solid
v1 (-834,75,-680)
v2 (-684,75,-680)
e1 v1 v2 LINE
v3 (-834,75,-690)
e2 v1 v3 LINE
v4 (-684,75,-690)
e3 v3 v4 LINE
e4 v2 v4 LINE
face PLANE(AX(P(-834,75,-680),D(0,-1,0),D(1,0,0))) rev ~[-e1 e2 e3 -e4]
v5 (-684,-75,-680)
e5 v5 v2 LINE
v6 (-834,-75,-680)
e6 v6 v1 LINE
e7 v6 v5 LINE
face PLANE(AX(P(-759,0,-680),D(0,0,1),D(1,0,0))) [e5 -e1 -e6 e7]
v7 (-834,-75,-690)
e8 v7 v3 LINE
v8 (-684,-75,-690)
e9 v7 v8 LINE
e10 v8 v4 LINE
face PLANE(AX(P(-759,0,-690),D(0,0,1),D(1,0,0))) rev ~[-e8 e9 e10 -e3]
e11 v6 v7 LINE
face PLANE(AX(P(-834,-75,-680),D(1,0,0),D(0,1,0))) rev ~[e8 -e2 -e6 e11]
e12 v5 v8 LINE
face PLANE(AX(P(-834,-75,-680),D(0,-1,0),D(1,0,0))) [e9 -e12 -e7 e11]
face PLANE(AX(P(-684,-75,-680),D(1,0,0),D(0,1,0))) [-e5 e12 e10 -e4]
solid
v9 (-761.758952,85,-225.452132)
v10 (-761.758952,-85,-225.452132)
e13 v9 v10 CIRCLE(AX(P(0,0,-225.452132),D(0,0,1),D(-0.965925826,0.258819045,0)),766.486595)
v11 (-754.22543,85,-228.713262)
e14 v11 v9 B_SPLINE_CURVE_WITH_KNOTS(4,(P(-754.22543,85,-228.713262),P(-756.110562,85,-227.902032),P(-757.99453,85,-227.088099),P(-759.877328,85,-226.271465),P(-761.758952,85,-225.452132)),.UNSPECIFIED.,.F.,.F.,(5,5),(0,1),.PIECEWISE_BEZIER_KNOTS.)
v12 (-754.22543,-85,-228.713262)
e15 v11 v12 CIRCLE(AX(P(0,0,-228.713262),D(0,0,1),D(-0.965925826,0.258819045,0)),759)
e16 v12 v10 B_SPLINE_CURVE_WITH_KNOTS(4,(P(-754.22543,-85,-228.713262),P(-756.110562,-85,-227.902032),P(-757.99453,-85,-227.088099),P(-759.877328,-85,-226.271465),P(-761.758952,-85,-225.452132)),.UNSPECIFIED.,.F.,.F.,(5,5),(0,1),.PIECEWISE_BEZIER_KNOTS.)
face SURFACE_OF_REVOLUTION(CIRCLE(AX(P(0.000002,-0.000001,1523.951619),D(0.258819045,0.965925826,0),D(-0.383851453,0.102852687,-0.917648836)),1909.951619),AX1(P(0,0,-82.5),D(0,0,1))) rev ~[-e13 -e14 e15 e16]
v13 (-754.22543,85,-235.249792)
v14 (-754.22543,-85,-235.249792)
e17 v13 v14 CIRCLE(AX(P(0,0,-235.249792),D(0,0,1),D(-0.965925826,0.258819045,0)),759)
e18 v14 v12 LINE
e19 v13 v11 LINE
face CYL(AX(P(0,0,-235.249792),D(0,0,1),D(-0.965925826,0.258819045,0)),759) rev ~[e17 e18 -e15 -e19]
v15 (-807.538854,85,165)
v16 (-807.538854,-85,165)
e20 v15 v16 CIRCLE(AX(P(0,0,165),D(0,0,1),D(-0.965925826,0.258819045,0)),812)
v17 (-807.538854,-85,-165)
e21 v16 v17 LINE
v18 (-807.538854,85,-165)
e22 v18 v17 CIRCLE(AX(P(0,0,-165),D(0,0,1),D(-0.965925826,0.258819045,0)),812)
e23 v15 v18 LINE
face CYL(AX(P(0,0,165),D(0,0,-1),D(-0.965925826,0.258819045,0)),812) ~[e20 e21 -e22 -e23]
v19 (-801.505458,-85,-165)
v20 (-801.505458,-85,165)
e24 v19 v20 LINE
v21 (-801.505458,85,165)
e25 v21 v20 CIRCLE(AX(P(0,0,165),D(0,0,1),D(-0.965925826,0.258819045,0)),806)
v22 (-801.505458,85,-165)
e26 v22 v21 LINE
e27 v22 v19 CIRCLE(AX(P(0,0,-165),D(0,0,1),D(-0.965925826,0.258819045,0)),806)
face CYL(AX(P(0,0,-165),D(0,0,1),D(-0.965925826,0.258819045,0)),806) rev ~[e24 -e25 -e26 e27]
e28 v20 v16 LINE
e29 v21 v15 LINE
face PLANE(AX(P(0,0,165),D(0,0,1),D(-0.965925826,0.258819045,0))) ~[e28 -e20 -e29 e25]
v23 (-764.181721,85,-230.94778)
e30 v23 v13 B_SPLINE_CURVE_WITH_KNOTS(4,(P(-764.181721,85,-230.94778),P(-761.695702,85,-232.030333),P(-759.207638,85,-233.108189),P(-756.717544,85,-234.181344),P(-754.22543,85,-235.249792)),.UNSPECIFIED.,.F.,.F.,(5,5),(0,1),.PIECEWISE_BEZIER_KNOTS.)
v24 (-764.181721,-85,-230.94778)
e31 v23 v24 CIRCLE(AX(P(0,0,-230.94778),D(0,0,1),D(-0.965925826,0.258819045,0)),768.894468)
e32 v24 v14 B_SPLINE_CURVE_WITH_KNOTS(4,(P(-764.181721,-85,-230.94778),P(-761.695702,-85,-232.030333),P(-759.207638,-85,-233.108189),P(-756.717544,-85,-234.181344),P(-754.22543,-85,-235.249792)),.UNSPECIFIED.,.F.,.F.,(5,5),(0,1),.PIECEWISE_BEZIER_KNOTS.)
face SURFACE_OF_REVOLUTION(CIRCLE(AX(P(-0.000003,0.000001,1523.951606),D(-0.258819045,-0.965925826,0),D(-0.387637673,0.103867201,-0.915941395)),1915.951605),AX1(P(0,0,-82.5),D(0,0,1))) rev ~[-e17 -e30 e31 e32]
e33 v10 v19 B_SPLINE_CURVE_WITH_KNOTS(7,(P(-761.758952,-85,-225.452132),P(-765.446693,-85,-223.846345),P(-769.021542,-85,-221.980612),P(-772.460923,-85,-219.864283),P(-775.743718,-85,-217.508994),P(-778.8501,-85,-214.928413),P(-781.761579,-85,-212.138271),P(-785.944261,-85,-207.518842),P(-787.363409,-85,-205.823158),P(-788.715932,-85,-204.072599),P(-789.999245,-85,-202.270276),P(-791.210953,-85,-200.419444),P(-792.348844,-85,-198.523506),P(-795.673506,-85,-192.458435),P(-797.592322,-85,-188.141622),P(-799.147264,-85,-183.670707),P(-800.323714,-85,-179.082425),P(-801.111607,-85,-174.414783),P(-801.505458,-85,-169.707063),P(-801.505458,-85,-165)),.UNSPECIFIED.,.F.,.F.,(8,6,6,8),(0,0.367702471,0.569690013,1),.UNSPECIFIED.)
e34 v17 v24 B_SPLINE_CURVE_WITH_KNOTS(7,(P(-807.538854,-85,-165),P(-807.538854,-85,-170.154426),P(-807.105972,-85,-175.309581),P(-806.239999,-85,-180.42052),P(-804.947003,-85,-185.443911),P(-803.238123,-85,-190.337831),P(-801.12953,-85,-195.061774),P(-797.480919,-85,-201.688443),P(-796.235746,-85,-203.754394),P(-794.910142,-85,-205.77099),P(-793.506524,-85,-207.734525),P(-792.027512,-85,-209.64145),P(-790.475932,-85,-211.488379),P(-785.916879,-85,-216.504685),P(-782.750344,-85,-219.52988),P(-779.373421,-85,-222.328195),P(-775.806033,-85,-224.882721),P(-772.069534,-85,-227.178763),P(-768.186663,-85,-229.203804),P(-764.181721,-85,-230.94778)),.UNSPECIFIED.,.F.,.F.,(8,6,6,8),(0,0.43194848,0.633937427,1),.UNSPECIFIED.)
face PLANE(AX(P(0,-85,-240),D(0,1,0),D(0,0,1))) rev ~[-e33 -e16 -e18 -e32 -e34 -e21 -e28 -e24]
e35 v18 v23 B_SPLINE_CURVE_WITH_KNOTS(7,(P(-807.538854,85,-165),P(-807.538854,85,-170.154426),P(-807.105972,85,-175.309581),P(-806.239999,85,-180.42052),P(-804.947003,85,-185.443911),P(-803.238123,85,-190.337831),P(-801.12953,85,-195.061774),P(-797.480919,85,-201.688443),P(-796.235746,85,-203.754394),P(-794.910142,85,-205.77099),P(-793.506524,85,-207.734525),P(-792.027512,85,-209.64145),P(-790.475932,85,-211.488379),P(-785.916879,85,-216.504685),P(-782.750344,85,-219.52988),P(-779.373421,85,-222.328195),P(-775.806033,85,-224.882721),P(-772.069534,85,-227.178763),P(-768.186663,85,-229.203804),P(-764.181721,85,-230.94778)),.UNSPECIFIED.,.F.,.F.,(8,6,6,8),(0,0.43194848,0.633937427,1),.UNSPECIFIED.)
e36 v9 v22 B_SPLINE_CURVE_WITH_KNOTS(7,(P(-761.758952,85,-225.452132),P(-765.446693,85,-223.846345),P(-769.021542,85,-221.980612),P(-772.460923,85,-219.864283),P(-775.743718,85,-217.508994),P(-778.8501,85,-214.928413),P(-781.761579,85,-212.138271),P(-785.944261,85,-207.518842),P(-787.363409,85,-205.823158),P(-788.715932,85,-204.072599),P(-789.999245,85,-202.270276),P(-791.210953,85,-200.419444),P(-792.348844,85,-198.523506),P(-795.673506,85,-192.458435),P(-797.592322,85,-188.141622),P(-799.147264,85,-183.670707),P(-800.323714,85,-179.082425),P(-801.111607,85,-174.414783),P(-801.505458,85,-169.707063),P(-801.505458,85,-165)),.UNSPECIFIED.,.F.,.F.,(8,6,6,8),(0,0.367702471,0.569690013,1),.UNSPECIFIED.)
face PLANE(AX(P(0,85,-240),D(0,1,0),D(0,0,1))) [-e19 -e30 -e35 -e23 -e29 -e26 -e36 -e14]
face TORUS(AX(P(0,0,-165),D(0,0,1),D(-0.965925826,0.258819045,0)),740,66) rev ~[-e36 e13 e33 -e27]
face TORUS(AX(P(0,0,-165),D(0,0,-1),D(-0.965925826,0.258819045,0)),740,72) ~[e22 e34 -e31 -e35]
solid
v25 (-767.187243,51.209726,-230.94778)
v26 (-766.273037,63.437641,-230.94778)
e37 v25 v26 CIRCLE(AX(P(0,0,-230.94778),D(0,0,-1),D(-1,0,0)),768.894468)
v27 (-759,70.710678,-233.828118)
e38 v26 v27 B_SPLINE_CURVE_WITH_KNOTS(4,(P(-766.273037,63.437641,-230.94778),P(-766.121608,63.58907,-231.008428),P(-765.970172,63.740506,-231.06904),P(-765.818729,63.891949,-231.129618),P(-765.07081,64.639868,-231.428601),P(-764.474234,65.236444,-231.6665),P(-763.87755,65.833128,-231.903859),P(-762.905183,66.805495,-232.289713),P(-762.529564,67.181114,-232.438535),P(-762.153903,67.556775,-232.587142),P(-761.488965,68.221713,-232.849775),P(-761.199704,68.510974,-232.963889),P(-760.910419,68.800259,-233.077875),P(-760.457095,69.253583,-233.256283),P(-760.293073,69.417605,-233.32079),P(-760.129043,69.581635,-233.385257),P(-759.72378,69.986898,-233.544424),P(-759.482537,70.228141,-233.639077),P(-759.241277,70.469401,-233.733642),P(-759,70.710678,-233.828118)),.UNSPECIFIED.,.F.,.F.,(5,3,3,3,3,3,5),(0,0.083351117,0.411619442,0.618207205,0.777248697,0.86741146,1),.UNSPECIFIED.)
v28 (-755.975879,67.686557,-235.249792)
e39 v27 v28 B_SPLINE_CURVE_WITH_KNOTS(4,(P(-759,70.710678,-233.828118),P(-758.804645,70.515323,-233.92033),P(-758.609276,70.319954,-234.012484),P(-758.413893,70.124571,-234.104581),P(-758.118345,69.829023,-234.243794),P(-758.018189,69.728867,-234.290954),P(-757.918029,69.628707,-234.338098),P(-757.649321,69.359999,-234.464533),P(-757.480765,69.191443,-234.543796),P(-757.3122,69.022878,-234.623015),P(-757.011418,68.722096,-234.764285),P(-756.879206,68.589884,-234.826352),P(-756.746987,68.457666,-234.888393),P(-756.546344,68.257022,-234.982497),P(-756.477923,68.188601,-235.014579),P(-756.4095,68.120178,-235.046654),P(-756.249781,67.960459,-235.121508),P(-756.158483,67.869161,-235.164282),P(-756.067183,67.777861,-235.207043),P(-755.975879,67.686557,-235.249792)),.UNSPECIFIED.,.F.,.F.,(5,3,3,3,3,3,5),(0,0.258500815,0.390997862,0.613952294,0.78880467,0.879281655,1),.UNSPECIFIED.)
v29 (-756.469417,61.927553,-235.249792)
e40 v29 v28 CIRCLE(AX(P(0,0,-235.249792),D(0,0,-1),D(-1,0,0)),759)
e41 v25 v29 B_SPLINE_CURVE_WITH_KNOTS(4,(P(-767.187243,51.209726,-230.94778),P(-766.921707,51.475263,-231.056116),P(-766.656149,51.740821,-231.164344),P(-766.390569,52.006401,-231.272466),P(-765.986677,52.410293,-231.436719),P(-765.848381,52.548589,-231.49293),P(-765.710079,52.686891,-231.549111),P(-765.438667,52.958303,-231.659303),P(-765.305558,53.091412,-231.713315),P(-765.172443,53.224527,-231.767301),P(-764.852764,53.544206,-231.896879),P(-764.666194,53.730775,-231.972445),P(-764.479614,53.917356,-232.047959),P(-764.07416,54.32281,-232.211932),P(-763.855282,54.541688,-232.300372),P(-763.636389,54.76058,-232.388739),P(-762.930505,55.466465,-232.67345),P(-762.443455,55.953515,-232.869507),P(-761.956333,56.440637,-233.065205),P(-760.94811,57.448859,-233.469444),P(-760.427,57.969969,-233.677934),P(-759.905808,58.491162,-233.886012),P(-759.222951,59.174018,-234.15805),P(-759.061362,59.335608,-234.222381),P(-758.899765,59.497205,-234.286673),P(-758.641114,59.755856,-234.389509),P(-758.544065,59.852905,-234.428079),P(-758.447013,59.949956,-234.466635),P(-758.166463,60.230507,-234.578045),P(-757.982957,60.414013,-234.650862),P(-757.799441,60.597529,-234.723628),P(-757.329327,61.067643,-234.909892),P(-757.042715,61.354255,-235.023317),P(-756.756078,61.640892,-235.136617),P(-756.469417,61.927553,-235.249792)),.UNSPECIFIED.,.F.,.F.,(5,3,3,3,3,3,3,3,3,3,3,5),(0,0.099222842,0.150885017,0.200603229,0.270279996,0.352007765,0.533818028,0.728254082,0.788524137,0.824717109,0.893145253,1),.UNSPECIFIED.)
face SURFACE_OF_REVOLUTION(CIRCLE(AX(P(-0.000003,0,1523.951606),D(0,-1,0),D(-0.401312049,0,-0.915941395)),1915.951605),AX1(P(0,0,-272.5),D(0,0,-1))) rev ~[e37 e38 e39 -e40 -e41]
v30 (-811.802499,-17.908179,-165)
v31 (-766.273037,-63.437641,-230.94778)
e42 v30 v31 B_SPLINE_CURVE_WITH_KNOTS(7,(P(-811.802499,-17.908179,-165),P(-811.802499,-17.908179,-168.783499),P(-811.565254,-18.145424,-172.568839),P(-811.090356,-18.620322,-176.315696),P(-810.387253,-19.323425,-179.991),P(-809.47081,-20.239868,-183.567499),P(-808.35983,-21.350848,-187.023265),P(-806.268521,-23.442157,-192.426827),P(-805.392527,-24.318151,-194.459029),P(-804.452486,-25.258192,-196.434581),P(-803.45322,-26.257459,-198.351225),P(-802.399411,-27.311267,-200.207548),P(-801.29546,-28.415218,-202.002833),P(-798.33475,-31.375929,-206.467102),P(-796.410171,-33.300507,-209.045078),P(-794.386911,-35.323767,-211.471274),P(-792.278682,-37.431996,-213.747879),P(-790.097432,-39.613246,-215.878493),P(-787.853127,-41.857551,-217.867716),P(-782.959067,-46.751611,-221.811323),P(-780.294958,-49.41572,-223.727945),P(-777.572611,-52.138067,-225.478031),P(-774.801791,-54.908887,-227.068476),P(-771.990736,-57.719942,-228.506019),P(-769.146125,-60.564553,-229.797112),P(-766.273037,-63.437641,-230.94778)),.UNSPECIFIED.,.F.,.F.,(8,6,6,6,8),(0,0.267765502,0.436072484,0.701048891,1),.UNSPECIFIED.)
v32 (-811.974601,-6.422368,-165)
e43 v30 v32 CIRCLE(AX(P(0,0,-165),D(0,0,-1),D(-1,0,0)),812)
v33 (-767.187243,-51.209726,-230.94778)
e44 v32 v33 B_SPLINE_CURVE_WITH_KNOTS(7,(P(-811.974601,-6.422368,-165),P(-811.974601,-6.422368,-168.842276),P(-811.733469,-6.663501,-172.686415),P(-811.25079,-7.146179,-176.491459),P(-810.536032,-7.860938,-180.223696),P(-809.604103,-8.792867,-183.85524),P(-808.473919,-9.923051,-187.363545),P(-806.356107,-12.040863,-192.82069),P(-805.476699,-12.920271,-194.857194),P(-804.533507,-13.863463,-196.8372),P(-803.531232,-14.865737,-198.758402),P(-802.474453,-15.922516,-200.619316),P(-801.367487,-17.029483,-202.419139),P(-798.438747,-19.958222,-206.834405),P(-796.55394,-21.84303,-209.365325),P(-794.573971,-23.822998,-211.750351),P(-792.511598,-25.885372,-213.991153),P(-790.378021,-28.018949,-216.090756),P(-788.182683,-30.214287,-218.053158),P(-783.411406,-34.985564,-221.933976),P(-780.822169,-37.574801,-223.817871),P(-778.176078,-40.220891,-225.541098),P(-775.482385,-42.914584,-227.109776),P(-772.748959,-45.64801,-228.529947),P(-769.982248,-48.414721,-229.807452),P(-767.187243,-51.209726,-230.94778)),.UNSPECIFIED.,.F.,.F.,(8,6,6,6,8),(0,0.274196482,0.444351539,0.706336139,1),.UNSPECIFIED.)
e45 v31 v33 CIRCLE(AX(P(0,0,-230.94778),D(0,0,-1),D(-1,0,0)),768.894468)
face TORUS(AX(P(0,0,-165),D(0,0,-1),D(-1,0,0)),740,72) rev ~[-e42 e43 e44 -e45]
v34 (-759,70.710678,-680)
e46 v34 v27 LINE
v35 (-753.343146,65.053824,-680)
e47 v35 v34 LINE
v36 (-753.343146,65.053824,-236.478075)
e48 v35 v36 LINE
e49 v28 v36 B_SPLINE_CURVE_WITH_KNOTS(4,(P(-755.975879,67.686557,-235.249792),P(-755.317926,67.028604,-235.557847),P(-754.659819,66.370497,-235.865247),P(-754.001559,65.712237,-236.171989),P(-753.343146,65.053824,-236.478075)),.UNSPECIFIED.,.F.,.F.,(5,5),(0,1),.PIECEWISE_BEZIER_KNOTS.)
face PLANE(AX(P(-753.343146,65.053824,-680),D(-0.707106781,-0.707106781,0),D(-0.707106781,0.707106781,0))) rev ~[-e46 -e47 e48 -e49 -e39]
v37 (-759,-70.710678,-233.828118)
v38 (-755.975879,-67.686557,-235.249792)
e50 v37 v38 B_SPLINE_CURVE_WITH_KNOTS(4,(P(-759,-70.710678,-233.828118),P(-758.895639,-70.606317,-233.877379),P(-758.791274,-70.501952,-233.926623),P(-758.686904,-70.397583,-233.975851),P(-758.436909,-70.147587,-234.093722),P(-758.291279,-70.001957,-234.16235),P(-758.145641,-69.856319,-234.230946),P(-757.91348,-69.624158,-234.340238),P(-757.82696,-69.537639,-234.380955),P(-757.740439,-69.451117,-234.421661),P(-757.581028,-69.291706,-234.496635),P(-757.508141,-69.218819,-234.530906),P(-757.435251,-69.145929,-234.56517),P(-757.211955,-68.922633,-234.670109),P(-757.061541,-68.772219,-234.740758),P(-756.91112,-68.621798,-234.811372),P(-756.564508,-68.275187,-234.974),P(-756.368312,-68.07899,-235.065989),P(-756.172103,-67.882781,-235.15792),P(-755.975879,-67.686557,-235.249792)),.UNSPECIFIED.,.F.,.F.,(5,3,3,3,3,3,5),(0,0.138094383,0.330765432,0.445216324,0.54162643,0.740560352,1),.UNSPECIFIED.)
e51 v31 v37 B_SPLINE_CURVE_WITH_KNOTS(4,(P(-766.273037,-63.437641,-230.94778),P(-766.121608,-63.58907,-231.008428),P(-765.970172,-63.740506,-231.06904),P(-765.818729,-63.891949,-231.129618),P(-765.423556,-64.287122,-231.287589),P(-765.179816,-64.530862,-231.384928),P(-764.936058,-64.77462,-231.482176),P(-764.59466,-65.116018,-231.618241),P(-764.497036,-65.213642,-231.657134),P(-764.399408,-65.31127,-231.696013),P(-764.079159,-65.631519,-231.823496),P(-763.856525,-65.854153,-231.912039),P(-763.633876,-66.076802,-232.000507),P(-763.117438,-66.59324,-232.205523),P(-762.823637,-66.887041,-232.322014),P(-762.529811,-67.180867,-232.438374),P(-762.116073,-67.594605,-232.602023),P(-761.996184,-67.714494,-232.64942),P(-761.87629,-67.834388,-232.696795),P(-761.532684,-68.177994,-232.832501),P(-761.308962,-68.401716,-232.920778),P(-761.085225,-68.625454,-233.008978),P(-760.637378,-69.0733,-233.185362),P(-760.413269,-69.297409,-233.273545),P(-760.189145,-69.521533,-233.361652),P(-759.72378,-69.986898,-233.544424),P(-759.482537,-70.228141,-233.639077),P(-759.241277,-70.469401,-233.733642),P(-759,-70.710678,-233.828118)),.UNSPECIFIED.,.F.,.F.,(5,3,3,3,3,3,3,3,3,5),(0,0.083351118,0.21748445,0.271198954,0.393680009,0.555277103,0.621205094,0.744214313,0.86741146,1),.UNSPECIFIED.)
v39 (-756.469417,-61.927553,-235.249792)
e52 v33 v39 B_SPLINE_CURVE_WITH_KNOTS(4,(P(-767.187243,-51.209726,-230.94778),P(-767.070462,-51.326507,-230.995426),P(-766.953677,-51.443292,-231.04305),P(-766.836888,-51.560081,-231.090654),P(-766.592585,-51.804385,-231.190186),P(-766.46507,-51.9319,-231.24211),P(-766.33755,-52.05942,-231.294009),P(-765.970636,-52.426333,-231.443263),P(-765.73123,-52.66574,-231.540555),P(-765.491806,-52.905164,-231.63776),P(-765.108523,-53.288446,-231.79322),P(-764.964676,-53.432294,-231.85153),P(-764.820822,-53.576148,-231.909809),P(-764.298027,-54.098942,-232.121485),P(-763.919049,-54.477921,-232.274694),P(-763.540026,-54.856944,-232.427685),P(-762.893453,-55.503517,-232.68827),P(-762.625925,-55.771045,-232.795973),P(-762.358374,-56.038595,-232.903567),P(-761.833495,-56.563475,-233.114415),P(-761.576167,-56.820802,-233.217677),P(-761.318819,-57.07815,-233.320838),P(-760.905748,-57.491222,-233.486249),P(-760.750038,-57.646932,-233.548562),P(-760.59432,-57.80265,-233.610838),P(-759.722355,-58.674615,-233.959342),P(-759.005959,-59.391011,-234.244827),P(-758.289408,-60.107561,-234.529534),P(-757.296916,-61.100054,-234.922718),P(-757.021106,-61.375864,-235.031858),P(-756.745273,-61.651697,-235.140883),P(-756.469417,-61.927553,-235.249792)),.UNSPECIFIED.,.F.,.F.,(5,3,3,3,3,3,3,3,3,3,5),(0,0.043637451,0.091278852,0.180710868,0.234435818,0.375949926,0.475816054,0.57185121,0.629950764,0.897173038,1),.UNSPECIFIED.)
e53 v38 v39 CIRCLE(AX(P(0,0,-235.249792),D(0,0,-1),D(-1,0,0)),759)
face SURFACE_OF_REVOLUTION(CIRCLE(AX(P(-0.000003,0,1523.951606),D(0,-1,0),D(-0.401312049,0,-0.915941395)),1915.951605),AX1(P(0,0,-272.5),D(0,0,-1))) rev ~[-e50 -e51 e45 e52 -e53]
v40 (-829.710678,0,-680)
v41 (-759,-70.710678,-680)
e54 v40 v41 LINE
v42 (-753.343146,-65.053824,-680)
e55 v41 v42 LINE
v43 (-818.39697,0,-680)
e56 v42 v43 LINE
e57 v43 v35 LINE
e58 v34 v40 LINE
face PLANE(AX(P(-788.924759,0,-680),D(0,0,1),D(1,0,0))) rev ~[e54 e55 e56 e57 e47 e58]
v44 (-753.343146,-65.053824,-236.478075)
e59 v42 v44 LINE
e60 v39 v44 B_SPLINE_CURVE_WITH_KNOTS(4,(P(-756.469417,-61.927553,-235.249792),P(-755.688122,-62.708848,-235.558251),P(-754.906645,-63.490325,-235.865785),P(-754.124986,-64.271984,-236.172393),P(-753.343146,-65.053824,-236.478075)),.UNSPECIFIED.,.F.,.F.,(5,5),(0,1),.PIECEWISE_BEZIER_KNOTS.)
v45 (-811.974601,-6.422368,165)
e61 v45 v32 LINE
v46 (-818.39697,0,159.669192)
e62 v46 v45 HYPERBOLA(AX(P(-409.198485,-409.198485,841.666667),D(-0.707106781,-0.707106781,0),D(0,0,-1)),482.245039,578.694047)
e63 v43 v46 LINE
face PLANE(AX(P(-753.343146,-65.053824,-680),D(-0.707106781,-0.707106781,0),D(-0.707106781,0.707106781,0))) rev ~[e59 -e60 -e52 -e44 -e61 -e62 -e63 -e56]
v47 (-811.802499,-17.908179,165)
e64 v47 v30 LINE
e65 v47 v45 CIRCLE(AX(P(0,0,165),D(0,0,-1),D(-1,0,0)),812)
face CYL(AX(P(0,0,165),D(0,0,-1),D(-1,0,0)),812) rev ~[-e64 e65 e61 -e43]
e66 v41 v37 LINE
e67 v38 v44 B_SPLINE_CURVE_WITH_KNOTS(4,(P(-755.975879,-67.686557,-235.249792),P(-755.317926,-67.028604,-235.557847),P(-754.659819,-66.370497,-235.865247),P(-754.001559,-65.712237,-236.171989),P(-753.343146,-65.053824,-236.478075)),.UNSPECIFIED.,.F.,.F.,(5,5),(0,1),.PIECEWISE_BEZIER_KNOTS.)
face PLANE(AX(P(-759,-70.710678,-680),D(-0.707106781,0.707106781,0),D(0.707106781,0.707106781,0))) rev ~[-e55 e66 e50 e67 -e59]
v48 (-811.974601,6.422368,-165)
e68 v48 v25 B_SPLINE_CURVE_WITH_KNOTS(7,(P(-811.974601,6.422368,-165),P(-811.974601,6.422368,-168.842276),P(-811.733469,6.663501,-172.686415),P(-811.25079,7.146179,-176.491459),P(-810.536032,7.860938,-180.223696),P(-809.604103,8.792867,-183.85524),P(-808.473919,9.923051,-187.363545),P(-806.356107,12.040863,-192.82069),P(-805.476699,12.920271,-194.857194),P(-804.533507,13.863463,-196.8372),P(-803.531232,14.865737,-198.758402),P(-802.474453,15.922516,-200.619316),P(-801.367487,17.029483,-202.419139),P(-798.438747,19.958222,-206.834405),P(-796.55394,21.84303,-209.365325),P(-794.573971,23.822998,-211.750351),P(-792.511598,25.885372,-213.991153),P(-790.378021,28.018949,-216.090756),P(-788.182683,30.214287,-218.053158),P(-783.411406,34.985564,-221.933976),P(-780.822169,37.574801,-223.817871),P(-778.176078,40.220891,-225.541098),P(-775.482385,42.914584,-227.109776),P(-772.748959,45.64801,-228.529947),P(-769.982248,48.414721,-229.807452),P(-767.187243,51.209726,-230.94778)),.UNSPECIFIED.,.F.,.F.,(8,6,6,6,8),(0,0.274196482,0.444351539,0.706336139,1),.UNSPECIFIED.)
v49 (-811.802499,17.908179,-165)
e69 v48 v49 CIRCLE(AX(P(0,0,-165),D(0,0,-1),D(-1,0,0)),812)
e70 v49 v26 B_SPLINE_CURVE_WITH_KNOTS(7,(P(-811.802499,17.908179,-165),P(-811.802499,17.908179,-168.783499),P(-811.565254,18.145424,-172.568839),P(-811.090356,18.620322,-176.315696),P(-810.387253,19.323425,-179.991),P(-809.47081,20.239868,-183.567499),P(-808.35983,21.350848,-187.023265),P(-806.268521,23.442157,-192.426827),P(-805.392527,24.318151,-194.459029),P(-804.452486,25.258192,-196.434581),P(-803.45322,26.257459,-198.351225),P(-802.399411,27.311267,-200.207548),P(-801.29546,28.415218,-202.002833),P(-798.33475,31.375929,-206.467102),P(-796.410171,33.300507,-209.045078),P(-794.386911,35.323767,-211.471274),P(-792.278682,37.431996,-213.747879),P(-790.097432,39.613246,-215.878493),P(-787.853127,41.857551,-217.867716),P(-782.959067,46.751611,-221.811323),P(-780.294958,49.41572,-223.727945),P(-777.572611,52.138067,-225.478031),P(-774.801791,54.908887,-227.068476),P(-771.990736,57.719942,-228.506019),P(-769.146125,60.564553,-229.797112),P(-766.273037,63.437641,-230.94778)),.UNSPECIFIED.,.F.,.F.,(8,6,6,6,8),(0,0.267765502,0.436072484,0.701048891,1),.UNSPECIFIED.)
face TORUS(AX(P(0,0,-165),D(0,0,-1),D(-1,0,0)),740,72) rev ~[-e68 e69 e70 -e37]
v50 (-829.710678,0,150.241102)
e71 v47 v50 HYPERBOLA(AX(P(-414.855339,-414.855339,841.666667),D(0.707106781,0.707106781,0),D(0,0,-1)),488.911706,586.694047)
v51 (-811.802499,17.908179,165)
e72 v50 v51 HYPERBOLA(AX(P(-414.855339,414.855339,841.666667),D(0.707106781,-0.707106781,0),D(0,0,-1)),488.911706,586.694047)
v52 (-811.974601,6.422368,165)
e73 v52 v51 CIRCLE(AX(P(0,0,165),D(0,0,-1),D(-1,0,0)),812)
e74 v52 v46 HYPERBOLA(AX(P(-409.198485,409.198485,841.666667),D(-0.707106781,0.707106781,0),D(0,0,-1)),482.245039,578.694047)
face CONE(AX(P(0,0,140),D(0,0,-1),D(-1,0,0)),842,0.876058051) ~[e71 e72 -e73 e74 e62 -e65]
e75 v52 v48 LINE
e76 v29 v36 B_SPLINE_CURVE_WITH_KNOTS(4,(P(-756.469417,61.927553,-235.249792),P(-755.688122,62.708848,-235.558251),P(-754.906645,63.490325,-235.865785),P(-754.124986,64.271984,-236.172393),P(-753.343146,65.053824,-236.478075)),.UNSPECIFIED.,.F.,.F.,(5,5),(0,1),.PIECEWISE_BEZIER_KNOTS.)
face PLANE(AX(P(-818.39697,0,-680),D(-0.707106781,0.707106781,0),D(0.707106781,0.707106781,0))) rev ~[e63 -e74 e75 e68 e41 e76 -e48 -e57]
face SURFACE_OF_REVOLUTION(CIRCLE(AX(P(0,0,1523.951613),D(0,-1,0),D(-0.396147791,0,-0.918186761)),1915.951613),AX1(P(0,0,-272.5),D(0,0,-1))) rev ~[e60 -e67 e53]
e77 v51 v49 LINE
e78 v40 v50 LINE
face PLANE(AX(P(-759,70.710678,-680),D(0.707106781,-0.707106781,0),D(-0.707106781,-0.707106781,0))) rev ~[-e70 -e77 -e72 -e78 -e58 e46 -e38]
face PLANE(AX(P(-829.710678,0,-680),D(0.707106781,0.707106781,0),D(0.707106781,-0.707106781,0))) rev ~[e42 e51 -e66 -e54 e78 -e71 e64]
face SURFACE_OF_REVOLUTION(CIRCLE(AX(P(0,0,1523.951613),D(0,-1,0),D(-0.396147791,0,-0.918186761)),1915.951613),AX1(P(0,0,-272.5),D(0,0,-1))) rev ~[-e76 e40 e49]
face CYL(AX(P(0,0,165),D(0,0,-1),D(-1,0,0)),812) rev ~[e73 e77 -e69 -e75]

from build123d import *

# Parameters (mm, degrees)
F1_ANGLE_BACK = 15
F1_ANGLE      = 30
F2_W          = 610.7713580132
F2_H          = 748.7817406654
F2_W_2        = 170
F2_H_2        = 405
F3_DEPTH      = 812.0010001
F6_DEPTH      = 845
F5_W          = 150
F5_H          = 150
F7_DEPTH      = 10


with BuildPart() as f1:
    # F0 (on Front) → F1 (revolve)
    with BuildSketch(Plane.XZ, mode=Mode.PRIVATE) as f1_sk:
        with BuildLine():
            ThreePointArc((-759, -228.7132619749), (-762.7450404957, -227.0866981656), (-766.4865952329, -225.4521320796))
            ThreePointArc((-766.4865952329, -225.4521320796), (-795.2454309666, -201.1101420284), (-806, -165))
            Line((-806, -165), (-806, 165))
            Line((-806, 165), (-812, 165))
            Line((-812, 165), (-812, -165))
            ThreePointArc((-812, -165), (-800.2677428727, -204.3928822129), (-768.8944675268, -230.9477804505))
            ThreePointArc((-768.8944675268, -230.9477804505), (-763.9502619939, -233.1057510397), (-759, -235.2497919923))
            Line((-759, -235.2497919923), (-759, -228.713261975))
        make_face()
    revolve(f1_sk.sketch.rotate(Axis((0, 0, -82.5), (0, 0, 1)), -F1_ANGLE_BACK), axis=Axis((0, 0, -82.5), (0, 0, 1)), revolution_arc=F1_ANGLE)

    # F2 (on Right) → F3 (cut, through all)
    with BuildSketch(Plane.YZ):
        Rectangle(F2_W, F2_H)
        with Locations((0, -37.5)):
            Rectangle(F2_W_2, F2_H_2, mode=Mode.SUBTRACT)
    extrude(amount=-F3_DEPTH, mode=Mode.SUBTRACT)


with BuildPart() as f6:
    # F5 (on offset) → F6 (new body)
    with BuildSketch(Plane.XY.offset(-680)):
        Polygon((-759, 70.7106781187), (-829.7106781187, 0), (-759, -70.7106781187), (-753.3431457505, -65.0538238692), (-818.3969696197, 0), (-753.3431457505, 65.0538238692), align=None)
    extrude(amount=F6_DEPTH)

    # F0 (on Front) → F8 (revolve, cut)
    with BuildSketch(Plane.XZ):
        with BuildLine():
            ThreePointArc((-806, -165), (-795.2454309666, -201.1101420284), (-766.4865952329, -225.4521320796))
            ThreePointArc((-766.4865952329, -225.4521320796), (-762.7450404957, -227.0866981656), (-759, -228.7132619749))
            Line((-759, -228.713261975), (-759, 165))
            Line((-759, 165), (-806, 165))
            Line((-806, 165), (-806, -165))
        make_face()
        with BuildLine():
            ThreePointArc((-759, -228.7132619749), (-762.7450404957, -227.0866981656), (-766.4865952329, -225.4521320796))
            ThreePointArc((-766.4865952329, -225.4521320796), (-795.2454309666, -201.1101420284), (-806, -165))
            Line((-806, -165), (-806, 165))
            Line((-806, 165), (-812, 165))
            Line((-812, 165), (-812, -165))
            ThreePointArc((-812, -165), (-800.2677428727, -204.3928822129), (-768.8944675268, -230.9477804505))
            ThreePointArc((-768.8944675268, -230.9477804505), (-763.9502619939, -233.1057510397), (-759, -235.2497919923))
            Line((-759, -235.2497919923), (-759, -228.713261975))
        make_face()
        with BuildLine():
            Line((-759, 165), (-759, -228.713261975))
            ThreePointArc((-759, -228.7132619749), (-734.5550951922, -239.0980108337), (-709.968149662, -249.141839258))
            Line((-709.968149662, -249.141839258), (-709.968149662, -235.2497919923))
            Line((-709.968149662, -235.2497919923), (-709.968149662, 165))
            Line((-709.968149662, 165), (-759, 165))
        make_face()
        with BuildLine():
            ThreePointArc((-709.968149662, -249.141839258), (-734.5550951922, -239.0980108337), (-759, -228.7132619749))
            Line((-759, -228.713261975), (-759, -235.2497919923))
            ThreePointArc((-759, -235.2497919923), (-734.5545744528, -245.5963972216), (-709.968149662, -255.6033341136))
            Line((-709.968149662, -255.6033341136), (-709.968149662, -249.141839258))
        make_face()
    revolve(axis=Axis((0, 0, -272.5), (0, 0, -1)), mode=Mode.SUBTRACT)

    # F0 (on Front) → F9 (revolve, cut)
    with BuildSketch(Plane.XZ):
        Polygon((-842, 140), (-812, 165), (-842, 165), align=None)
    revolve(axis=Axis((0, 0, -272.5), (0, 0, -1)), mode=Mode.SUBTRACT)


with BuildPart() as f7:
    # F5 (on offset) → F7 (new body)
    with BuildSketch(Plane.XY.offset(-680)):
        with Locations((-759, 0)):
            Rectangle(F5_W, F5_H)
        Polygon((-759, -70.7106781187), (-829.7106781187, 0), (-759, 70.7106781187), (-753.3431457505, 65.0538238692), (-818.3969696197, 0), (-753.3431457505, -65.0538238692), align=None, mode=Mode.SUBTRACT)
        Polygon((-759, 70.7106781187), (-829.7106781187, 0), (-759, -70.7106781187), (-753.3431457505, -65.0538238692), (-818.3969696197, 0), (-753.3431457505, 65.0538238692), align=None)
    extrude(amount=-F7_DEPTH)


solid = Compound([f1.part, f6.part, f7.part])
